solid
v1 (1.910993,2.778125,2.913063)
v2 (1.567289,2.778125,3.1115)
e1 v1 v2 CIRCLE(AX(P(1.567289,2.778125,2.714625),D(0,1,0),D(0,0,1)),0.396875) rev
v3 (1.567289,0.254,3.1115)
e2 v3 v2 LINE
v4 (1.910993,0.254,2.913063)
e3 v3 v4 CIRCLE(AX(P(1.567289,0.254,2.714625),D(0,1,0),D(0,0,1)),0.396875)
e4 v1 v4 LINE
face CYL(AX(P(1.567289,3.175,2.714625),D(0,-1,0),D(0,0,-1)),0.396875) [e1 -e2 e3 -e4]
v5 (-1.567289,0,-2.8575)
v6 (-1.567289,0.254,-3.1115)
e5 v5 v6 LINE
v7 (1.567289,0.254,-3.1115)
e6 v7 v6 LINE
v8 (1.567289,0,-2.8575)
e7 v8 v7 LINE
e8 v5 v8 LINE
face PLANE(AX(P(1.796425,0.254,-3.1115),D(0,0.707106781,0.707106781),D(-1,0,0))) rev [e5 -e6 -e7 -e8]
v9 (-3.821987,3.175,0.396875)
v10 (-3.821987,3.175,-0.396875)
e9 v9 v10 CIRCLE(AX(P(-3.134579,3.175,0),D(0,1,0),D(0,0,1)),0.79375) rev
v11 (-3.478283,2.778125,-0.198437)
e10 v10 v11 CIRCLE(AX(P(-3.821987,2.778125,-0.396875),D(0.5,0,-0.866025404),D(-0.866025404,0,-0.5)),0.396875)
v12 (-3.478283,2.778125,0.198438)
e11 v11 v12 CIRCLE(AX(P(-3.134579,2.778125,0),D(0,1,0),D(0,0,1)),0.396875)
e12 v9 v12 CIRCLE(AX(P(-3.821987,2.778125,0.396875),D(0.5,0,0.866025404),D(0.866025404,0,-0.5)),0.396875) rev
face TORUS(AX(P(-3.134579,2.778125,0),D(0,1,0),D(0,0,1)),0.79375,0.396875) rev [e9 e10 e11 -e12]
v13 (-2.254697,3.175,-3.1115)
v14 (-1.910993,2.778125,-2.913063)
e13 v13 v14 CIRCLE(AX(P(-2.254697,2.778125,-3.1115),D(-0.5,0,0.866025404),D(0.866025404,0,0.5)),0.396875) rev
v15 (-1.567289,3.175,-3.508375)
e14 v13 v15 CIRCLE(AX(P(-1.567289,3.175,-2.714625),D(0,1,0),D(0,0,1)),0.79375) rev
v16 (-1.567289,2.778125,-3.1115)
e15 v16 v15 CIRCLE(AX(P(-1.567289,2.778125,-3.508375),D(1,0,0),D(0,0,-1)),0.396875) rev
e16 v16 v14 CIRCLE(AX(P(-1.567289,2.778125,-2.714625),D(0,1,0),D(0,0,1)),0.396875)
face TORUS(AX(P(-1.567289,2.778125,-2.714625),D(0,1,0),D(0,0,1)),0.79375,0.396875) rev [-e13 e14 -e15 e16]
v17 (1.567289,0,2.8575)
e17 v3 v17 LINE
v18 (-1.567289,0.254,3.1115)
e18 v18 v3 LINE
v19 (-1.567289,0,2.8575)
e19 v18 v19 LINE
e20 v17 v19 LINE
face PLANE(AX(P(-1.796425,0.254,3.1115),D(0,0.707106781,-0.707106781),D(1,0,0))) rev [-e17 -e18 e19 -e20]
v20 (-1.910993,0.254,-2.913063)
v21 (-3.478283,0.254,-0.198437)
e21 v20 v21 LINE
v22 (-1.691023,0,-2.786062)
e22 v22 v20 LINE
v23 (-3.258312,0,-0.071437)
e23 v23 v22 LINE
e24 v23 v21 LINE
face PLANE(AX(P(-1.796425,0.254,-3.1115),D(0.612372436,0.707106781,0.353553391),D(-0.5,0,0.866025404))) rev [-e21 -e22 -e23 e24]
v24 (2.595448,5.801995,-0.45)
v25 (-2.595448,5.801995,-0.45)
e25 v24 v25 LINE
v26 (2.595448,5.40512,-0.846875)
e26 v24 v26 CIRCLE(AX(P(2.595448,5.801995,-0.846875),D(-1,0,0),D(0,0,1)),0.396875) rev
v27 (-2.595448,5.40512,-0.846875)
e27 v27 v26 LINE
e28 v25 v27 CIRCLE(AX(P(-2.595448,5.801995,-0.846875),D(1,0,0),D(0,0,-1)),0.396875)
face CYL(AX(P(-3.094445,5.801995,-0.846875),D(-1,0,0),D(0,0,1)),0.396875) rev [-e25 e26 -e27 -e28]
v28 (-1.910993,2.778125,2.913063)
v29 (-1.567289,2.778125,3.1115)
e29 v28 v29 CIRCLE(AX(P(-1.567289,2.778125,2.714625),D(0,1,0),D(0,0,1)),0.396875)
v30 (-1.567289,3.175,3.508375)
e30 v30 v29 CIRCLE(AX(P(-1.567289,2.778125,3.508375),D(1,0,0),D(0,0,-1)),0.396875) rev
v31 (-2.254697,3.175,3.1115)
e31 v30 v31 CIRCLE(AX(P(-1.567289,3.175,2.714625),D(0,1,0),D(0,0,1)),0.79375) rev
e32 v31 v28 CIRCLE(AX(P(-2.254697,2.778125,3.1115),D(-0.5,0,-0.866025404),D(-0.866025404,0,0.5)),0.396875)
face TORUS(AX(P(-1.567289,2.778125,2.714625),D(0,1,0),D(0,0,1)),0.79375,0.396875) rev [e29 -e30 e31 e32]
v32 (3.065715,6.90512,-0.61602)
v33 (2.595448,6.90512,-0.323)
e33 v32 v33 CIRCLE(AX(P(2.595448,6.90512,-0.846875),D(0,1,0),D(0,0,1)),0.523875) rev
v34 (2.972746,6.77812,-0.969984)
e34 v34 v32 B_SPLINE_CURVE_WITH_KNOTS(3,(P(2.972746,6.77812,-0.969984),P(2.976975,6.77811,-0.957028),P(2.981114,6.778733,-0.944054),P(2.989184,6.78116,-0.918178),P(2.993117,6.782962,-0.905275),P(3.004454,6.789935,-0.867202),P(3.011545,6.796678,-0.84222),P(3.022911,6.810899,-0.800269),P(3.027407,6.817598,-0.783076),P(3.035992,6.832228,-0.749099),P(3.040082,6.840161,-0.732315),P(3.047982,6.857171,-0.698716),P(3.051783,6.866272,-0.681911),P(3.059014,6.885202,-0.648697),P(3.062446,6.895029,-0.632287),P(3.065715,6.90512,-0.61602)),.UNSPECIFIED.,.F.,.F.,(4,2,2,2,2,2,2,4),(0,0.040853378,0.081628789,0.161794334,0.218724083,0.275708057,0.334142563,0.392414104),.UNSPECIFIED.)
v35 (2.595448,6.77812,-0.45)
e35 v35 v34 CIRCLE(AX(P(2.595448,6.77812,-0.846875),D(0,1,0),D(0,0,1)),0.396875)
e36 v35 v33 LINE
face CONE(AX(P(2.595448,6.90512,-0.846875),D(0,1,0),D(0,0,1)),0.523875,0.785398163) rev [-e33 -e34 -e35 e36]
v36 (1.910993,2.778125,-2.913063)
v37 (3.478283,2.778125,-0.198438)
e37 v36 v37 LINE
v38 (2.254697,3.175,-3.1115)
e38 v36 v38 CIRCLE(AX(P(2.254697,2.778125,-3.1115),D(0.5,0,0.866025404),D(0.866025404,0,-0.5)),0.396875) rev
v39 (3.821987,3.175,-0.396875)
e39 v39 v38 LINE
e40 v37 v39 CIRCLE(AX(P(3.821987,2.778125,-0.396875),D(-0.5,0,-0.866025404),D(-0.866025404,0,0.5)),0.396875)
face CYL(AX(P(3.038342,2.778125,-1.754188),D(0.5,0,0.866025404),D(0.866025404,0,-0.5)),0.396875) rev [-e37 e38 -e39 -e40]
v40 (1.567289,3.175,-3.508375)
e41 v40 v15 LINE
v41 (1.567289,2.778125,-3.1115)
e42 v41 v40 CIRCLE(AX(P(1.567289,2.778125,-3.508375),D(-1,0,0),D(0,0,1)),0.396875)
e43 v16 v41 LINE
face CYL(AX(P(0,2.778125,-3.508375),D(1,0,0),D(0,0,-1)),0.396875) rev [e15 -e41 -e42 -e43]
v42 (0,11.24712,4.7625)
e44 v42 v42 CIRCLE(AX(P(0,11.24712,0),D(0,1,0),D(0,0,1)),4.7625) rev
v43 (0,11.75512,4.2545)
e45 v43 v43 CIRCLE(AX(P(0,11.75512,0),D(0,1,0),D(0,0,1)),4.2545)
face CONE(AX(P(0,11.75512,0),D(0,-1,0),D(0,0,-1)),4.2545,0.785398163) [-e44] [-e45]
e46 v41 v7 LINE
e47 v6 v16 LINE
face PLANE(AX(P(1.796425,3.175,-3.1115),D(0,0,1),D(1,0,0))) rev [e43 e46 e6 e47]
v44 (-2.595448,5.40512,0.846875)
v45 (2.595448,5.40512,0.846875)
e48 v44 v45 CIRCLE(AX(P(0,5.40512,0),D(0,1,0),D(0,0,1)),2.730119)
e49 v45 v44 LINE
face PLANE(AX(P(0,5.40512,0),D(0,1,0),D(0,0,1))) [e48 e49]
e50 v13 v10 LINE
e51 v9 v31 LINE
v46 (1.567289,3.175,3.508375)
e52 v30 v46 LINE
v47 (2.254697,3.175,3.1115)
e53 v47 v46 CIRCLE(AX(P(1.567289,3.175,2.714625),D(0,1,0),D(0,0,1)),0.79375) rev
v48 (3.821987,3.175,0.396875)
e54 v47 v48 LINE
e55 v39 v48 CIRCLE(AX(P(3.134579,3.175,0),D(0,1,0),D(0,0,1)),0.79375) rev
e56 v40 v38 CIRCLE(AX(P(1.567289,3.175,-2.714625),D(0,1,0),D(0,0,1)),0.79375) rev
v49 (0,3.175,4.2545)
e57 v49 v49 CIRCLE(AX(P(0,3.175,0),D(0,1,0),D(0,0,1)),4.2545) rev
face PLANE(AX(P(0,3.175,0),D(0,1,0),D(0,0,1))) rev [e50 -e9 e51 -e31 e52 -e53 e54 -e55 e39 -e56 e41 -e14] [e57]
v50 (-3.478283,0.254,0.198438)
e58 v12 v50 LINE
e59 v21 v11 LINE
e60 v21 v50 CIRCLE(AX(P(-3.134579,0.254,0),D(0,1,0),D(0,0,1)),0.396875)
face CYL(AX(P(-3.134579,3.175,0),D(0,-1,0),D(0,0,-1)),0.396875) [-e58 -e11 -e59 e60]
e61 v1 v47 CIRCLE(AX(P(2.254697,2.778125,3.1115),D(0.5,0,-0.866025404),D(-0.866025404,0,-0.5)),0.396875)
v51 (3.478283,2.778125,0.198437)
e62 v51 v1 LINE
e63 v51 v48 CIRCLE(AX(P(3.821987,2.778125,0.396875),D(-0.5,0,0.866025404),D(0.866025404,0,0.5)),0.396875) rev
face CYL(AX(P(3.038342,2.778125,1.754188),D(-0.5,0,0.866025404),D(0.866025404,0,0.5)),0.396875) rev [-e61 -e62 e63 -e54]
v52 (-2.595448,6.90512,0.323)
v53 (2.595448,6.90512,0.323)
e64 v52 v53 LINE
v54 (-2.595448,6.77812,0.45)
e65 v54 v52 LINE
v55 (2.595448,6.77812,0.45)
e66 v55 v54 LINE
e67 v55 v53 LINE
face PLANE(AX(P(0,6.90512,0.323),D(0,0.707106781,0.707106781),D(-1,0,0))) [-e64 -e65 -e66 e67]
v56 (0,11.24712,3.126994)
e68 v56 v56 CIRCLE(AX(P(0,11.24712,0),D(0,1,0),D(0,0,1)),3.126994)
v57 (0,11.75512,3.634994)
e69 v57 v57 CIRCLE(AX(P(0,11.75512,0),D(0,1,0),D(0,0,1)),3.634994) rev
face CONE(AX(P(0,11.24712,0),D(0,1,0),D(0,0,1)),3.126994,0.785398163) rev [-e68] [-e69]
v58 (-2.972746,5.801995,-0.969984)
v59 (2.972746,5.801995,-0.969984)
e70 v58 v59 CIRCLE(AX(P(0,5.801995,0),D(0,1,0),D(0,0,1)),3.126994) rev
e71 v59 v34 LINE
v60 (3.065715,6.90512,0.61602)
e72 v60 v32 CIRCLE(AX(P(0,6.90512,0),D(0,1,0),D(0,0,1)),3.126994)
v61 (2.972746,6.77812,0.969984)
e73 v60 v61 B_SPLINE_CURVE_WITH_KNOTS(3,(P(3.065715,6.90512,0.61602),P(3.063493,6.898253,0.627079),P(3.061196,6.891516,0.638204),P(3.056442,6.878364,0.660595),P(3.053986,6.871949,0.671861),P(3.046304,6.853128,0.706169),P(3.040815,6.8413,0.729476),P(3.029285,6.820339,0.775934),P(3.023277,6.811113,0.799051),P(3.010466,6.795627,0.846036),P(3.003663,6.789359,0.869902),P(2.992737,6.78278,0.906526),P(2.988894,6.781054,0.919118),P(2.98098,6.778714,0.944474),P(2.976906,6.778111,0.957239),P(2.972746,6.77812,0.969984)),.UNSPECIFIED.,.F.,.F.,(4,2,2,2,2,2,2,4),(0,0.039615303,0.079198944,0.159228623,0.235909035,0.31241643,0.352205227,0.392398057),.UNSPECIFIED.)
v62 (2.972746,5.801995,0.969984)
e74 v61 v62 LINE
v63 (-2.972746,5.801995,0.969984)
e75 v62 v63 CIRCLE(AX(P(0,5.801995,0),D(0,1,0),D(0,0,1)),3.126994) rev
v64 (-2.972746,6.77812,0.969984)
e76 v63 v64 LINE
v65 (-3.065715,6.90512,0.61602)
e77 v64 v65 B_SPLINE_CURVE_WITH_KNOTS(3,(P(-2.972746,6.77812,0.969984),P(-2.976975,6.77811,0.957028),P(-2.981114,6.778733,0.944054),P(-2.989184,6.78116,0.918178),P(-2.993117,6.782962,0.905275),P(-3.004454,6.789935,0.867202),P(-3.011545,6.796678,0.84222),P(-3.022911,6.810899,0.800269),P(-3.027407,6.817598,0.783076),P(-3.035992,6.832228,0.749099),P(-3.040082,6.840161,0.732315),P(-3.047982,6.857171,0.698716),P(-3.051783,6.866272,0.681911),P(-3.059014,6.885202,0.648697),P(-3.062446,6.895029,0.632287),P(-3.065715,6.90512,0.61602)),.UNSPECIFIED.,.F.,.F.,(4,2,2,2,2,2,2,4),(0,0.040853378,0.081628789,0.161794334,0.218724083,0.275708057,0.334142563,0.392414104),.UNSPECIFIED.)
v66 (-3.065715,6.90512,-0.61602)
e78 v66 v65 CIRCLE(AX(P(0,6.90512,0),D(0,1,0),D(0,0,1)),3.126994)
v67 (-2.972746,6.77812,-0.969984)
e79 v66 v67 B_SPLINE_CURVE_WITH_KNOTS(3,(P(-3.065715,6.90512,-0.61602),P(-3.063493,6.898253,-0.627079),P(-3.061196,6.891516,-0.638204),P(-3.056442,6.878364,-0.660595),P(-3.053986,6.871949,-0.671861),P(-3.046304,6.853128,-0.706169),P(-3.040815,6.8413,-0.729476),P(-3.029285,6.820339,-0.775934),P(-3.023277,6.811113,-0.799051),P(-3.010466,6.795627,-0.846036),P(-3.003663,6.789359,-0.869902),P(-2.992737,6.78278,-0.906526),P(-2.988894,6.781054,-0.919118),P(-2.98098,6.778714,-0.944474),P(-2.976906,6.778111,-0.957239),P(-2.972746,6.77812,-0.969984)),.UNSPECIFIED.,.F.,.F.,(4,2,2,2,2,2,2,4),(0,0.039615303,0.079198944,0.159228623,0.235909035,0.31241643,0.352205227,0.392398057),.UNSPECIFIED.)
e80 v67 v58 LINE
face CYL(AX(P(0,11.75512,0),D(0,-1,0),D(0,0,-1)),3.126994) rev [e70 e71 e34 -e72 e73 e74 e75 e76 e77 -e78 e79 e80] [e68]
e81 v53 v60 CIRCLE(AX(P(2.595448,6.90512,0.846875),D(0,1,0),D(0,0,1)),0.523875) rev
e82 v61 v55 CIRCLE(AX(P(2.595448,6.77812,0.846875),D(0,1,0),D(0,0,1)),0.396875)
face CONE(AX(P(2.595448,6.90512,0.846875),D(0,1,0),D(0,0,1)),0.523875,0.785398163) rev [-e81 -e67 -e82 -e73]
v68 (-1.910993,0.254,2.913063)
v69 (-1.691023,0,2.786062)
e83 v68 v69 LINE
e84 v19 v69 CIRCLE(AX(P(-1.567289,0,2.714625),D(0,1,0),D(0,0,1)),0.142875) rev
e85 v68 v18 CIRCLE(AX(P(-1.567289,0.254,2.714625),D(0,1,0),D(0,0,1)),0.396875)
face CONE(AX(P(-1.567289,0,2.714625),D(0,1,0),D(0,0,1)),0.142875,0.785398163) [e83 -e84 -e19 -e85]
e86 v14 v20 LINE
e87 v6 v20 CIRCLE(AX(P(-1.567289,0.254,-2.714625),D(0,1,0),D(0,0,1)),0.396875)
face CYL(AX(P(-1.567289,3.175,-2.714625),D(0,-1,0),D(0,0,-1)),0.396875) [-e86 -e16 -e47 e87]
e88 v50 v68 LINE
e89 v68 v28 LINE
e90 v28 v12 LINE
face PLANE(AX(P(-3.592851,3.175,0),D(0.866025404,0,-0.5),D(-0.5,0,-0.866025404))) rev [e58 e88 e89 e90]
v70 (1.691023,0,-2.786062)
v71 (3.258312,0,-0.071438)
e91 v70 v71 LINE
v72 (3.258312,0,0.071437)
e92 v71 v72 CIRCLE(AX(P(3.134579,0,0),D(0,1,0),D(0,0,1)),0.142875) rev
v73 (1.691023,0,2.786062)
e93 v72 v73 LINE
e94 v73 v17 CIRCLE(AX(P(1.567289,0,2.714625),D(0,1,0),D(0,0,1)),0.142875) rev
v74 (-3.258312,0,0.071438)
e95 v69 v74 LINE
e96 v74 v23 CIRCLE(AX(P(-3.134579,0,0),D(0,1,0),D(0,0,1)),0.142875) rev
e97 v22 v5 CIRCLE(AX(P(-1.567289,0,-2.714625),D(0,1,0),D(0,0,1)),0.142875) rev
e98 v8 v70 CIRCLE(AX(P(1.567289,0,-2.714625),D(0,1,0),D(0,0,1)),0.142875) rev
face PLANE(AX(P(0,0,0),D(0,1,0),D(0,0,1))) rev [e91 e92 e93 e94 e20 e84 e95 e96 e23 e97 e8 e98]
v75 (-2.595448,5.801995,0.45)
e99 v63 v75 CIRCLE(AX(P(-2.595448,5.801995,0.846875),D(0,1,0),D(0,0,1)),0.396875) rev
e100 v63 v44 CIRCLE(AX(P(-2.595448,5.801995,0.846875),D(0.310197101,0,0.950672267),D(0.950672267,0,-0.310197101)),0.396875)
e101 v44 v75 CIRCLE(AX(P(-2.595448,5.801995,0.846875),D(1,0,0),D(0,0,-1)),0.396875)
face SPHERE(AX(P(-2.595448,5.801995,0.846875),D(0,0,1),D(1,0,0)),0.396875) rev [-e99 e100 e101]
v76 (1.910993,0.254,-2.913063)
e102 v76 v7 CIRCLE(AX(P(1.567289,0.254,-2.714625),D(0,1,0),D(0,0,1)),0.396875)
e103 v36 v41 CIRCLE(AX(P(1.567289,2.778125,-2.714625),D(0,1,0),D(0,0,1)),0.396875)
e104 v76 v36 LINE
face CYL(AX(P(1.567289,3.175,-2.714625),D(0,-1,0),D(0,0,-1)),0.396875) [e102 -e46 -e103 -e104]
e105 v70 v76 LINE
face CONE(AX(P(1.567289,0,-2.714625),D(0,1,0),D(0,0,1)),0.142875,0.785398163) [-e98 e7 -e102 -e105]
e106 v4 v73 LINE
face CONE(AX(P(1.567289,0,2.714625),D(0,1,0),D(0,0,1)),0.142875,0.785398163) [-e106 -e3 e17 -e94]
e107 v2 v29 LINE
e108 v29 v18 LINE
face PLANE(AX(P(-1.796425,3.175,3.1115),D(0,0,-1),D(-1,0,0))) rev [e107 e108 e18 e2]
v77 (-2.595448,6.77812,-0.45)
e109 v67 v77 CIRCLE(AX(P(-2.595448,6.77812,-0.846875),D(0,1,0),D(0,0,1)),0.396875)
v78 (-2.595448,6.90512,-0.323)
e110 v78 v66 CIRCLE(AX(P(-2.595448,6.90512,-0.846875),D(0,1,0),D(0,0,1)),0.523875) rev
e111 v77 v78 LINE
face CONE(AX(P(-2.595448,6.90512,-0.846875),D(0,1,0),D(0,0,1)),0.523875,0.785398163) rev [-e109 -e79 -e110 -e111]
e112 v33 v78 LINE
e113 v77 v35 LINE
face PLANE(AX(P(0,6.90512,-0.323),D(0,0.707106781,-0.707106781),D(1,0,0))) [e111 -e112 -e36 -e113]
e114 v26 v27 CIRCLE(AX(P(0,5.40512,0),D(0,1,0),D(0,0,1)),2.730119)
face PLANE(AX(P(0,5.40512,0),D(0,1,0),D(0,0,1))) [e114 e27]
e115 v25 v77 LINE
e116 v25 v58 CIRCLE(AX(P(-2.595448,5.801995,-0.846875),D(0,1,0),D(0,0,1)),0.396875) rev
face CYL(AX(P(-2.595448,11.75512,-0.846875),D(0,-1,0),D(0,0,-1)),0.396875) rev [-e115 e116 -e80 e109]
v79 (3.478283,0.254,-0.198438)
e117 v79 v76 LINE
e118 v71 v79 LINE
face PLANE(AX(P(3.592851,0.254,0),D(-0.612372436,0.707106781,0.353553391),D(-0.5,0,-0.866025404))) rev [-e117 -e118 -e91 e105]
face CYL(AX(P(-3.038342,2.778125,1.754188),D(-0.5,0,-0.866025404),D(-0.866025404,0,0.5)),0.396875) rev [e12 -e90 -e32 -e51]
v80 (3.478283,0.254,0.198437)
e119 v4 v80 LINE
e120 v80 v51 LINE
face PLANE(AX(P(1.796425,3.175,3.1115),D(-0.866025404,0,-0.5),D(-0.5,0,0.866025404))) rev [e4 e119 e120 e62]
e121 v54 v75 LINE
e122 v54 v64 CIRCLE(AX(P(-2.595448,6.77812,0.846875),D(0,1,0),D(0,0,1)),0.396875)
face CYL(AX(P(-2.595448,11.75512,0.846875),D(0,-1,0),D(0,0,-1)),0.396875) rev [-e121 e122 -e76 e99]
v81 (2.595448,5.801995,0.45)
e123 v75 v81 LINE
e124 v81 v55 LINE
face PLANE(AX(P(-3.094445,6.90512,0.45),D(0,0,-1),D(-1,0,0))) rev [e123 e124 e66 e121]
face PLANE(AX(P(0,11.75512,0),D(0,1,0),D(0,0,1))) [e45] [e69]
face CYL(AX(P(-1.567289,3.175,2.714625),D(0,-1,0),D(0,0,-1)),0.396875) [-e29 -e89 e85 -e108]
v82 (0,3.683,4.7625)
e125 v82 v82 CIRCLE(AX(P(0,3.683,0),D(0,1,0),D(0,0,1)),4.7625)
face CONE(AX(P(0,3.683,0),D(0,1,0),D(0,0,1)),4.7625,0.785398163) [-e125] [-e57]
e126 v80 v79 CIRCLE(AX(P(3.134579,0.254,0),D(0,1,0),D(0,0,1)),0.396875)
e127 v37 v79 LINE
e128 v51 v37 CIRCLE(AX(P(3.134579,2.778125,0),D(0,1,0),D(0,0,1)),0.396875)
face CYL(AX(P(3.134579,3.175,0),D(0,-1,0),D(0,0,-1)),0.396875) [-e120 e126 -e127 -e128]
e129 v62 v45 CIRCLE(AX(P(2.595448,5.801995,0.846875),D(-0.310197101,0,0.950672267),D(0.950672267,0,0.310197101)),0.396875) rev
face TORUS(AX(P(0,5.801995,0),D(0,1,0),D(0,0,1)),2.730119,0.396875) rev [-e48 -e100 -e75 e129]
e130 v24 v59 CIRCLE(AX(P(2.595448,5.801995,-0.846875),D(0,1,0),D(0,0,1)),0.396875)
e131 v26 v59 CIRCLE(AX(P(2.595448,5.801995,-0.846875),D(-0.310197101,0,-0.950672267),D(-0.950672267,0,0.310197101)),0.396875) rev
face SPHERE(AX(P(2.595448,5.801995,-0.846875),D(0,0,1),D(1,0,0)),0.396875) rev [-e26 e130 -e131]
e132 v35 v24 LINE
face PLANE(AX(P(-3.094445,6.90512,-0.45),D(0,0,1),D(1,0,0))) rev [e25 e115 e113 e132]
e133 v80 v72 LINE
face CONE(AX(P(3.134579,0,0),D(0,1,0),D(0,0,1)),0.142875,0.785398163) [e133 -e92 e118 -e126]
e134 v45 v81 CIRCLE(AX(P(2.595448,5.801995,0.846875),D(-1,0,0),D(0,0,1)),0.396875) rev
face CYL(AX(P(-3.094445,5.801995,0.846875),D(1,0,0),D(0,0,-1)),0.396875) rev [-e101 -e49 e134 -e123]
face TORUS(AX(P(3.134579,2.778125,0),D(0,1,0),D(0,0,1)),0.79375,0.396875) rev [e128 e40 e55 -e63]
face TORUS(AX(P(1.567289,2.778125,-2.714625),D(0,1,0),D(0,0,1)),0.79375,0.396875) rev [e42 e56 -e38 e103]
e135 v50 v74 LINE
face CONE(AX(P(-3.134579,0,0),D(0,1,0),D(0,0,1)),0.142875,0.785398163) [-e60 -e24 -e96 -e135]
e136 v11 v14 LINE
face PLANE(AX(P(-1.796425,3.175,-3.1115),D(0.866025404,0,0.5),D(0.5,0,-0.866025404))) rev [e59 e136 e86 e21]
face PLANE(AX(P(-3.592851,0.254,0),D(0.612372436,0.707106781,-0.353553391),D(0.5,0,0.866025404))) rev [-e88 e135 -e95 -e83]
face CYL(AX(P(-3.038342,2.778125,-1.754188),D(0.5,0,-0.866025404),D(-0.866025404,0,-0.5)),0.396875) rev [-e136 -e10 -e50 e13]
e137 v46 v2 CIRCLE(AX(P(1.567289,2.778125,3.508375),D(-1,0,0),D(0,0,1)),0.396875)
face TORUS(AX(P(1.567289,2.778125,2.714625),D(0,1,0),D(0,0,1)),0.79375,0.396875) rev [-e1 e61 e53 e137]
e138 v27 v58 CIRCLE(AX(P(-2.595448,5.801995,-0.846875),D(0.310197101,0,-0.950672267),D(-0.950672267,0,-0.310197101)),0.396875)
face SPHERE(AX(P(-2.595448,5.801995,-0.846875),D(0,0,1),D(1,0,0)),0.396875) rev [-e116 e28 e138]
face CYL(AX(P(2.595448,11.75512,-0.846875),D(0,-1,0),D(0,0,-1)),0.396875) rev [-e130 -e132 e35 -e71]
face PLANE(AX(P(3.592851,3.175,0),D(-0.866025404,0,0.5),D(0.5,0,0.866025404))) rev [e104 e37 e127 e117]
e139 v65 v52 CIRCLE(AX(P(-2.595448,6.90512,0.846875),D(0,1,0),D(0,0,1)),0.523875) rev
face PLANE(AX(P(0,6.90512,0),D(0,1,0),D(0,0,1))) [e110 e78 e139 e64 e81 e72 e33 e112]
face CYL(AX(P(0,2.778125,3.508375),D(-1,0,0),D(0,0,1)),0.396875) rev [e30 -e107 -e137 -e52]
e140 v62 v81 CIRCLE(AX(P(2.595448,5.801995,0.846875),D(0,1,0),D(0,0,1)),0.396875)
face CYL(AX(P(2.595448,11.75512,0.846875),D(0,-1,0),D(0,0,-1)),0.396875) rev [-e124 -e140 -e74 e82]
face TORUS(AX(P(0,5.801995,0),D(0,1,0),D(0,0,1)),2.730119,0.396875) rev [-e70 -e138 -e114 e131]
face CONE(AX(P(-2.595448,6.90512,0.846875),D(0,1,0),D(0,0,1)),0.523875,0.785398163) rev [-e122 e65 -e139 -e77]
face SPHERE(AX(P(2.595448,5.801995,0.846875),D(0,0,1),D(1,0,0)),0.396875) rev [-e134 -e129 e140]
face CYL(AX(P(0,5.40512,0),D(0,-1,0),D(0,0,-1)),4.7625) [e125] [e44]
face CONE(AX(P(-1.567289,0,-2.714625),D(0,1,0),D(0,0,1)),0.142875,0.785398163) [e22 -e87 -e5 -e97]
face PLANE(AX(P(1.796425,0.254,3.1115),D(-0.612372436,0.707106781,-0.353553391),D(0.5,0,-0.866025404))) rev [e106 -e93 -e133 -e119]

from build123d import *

# Parameters (mm, degrees)
BOSS_EXTRUDE1_DEPTH = 3.175
SKETCH2_R           = 4.7625
BOSS_EXTRUDE2_DEPTH = 2.23012
SKETCH3_R           = 4.7625
SKETCH3_R_2         = 3.126994
BOSS_EXTRUDE3_DEPTH = 6.35
BOSS_EXTRUDE4_DEPTH = 1.5
FILLET1_1_64_R      = 0.396875
CHAMFER1_0_02_SIZE  = 0.508
CHAMFER2_0_005_SIZE = 0.127
CHAMFER3_0_01_SIZE  = 0.254


with BuildPart() as part:
    # Sketch1 → Boss-Extrude1 (new body)
    with BuildSketch(Plane(origin=(0, 0, 0), x_dir=(1, 0, 0), z_dir=(0, 1, 0))):
        Polygon((1.796425363, 3.1115), (-1.796425363, 3.1115), (-3.592850725, 0), (-1.796425363, -3.1115), (1.796425363, -3.1115), (3.592850725, 0), align=None)
    extrude(amount=BOSS_EXTRUDE1_DEPTH)

    # Sketch2 → Boss-Extrude2 (add)
    with BuildSketch(Plane(origin=(0, 3.175, 0), x_dir=(1, 0, 0), z_dir=(0, 1, 0))):
        with Locations(Location((0, 0, 0), (0, 0, 270))):
            Circle(SKETCH2_R)
    extrude(amount=BOSS_EXTRUDE2_DEPTH)

    # Sketch3 → Boss-Extrude3 (add)
    with BuildSketch(Plane(origin=(0, 5.40512, 0), x_dir=(1, 0, 0), z_dir=(0, 1, 0))):
        with Locations(Location((0, 0, 0), (0, 0, 270))):
            Circle(SKETCH3_R)
        with Locations(Location((0, 0, 0), (0, 0, 270))):
            Circle(SKETCH3_R_2, mode=Mode.SUBTRACT)
    extrude(amount=BOSS_EXTRUDE3_DEPTH)

    # Sketch4 → Boss-Extrude4 (add)
    with BuildSketch(Plane(origin=(0, 5.40512, 0), x_dir=(1, 0, 0), z_dir=(0, 1, 0))):
        with BuildLine():
            Line((-3.094445261, 0.45), (3.094445261, 0.45))
            ThreePointArc((3.094445261, 0.45), (3.126994, 0), (3.094445261, -0.45))
            Line((3.094445261, -0.45), (-3.094445261, -0.45))
            ThreePointArc((-3.094445261, -0.45), (-3.126994, 0), (-3.094445261, 0.45))
        make_face()
    extrude(amount=BOSS_EXTRUDE4_DEPTH)

    # Fillet1-1/64
    fillet1_1_64_edges = [part.edges().sort_by_distance(p)[0] for p in [
        (-2.694638044, 3.175, -1.55575),
        (3.592850725, 1.5875, 0),
        (1.796425363, 1.5875, 3.1115),
        (-1.796425363, 1.5875, 3.1115),
        (-3.592850725, 1.5875, 0),
        (-1.796425363, 1.5875, -3.1115),
        (1.796425363, 1.5875, -3.1115),
        (-2.694638044, 3.175, 1.55575),
        (0, 3.175, 3.1115),
        (2.694638044, 3.175, 1.55575),
        (0, 5.40512, -3.126994),
        (-2.045842635, 5.40512, 2.36487196),
        (-3.094445261, 6.15512, -0.45),
        (0, 5.40512, 0.45),
        (-3.094445261, 6.15512, 0.45),
        (3.094445261, 6.15512, 0.45),
        (0, 5.40512, -0.45),
        (3.094445261, 6.15512, -0.45),
        (2.694638044, 3.175, -1.55575),
        (0, 3.175, -3.1115),
    ]]
    fillet(fillet1_1_64_edges, radius=FILLET1_1_64_R)

    # Chamfer1-0.02
    chamfer1_0_02_edges = [part.edges().sort_by_distance(p)[0] for p in [
        (0, 3.175, -4.7625),
        (0, 11.75512, -4.7625),
        (0, 11.75512, -3.126994),
    ]]
    chamfer(chamfer1_0_02_edges, length=CHAMFER1_0_02_SIZE)

    # Chamfer2-0.005
    # the kernel refuses this chamfer: 0.127 mm, written as the material it takes off along each edge
    with BuildSketch(Plane(origin=(-2.595448418, 6.90512, -0.45), x_dir=(0, 0.027495876610587285, 0.9996219169112968), z_dir=(1, 0, 0)), Plane(origin=(2.595448418, 6.90512, 0.45), x_dir=(0, 0.027495876610587285, -0.9996219169112968), z_dir=(-1, 0, 0))) as chamfer2_0_005_piece_1:
        Polygon((CHAMFER2_0_005_SIZE * 0.999621916911, CHAMFER2_0_005_SIZE * 0.0274958766106), (-CHAMFER2_0_005_SIZE * 0.0274958766106, CHAMFER2_0_005_SIZE * 0.999621916911), (0, 0), align=None)
    extrude(amount=5.190896835, mode=Mode.SUBTRACT)
    with BuildSketch(Plane(origin=(-2.595448418, 6.90512, -0.846875), x_dir=(-0.4186703663111546, 0, -0.9081382738178606), z_dir=(0.9081382738178606, 0, -0.4186703663111546))) as chamfer2_0_005_piece_2_section:
        Polygon((0.396875 + CHAMFER2_0_005_SIZE, 0), (0.396875, -CHAMFER2_0_005_SIZE), (0.396875, 0), align=None)
    chamfer2_0_005_piece_2 = revolve(axis=Axis((-2.595448418, 6.90512, -0.846875), (0, 1, 0)), revolution_arc=155.249329417, mode=Mode.PRIVATE)
    chamfer2_0_005_piece_2 = chamfer2_0_005_piece_2 & Plane(origin=(0, 6.859082355, 0), x_dir=(0, 0, 1), z_dir=(0, -1, 0)) * Cylinder(3.126994, 3, mode=Mode.PRIVATE)
    add(chamfer2_0_005_piece_2, mode=Mode.SUBTRACT)
    with BuildSketch(Plane(origin=(-2.595448418, 6.90512, 0.846875), x_dir=(-0.41867036631116117, 0, 0.9081382738178575), z_dir=(0.9081382738178575, 0, 0.41867036631116117))) as chamfer2_0_005_piece_3_section:
        Polygon((0.396875, CHAMFER2_0_005_SIZE), (0.396875 + CHAMFER2_0_005_SIZE, 0), (0.396875, 0), align=None)
    chamfer2_0_005_piece_3 = revolve(axis=Axis((-2.595448418, 6.90512, 0.846875), (0, -1, 0)), revolution_arc=155.249329417, mode=Mode.PRIVATE)
    chamfer2_0_005_piece_3 = chamfer2_0_005_piece_3 & Plane(origin=(0, 6.859082356, 0), x_dir=(0, 0, 1), z_dir=(0, -1, 0)) * Cylinder(3.126994, 3, mode=Mode.PRIVATE)
    add(chamfer2_0_005_piece_3, mode=Mode.SUBTRACT)
    with BuildSketch(Plane(origin=(2.595448418, 6.90512, -0.846875), x_dir=(0.41867036631115895, 0, -0.9081382738178586), z_dir=(-0.9081382738178586, 0, -0.41867036631115895))) as chamfer2_0_005_piece_4_section:
        Polygon((0.396875 + CHAMFER2_0_005_SIZE, 0), (0.396875, CHAMFER2_0_005_SIZE), (0.396875, 0), align=None)
    chamfer2_0_005_piece_4 = revolve(axis=Axis((2.595448418, 6.90512, -0.846875), (0, -1, 0)), revolution_arc=155.249329417, mode=Mode.PRIVATE)
    chamfer2_0_005_piece_4 = chamfer2_0_005_piece_4 & Plane(origin=(0, 6.859082492, 0), x_dir=(0, 0, 1), z_dir=(0, -1, 0)) * Cylinder(3.126994, 3, mode=Mode.PRIVATE)
    add(chamfer2_0_005_piece_4, mode=Mode.SUBTRACT)
    with BuildSketch(Plane(origin=(2.595448418, 6.90512, 0.846875), x_dir=(0.41867036631115895, 0, 0.9081382738178586), z_dir=(-0.9081382738178586, 0, 0.41867036631115895))) as chamfer2_0_005_piece_5_section:
        Polygon((0.396875 + CHAMFER2_0_005_SIZE, 0), (0.396875, -CHAMFER2_0_005_SIZE), (0.396875, 0), align=None)
    chamfer2_0_005_piece_5 = revolve(axis=Axis((2.595448418, 6.90512, 0.846875), (0, 1, 0)), revolution_arc=155.249329417, mode=Mode.PRIVATE)
    chamfer2_0_005_piece_5 = chamfer2_0_005_piece_5 & Plane(origin=(0, 6.859082356, 0), x_dir=(0, 0, 1), z_dir=(0, -1, 0)) * Cylinder(3.126994, 3, mode=Mode.PRIVATE)
    add(chamfer2_0_005_piece_5, mode=Mode.SUBTRACT)

    # Chamfer3-0.01
    chamfer3_0_01_edges = [part.edges().sort_by_distance(p)[0] for p in [
        (2.694638044, 0, 1.55575),
        (2.694638044, 0, -1.55575),
        (0, 0, 3.1115),
        (-2.694638044, 0, 1.55575),
        (-2.694638044, 0, -1.55575),
        (0, 0, -3.1115),
        (1.765726974, 0, -3.058328832),
        (3.531453949, 0, 0),
        (-1.765726974, 0, -3.058328832),
        (-3.531453949, 0, 0),
        (-1.765726974, 0, 3.058328832),
        (1.765726974, 0, 3.058328832),
    ]]
    chamfer(chamfer3_0_01_edges, length=CHAMFER3_0_01_SIZE)


solid = part.part
